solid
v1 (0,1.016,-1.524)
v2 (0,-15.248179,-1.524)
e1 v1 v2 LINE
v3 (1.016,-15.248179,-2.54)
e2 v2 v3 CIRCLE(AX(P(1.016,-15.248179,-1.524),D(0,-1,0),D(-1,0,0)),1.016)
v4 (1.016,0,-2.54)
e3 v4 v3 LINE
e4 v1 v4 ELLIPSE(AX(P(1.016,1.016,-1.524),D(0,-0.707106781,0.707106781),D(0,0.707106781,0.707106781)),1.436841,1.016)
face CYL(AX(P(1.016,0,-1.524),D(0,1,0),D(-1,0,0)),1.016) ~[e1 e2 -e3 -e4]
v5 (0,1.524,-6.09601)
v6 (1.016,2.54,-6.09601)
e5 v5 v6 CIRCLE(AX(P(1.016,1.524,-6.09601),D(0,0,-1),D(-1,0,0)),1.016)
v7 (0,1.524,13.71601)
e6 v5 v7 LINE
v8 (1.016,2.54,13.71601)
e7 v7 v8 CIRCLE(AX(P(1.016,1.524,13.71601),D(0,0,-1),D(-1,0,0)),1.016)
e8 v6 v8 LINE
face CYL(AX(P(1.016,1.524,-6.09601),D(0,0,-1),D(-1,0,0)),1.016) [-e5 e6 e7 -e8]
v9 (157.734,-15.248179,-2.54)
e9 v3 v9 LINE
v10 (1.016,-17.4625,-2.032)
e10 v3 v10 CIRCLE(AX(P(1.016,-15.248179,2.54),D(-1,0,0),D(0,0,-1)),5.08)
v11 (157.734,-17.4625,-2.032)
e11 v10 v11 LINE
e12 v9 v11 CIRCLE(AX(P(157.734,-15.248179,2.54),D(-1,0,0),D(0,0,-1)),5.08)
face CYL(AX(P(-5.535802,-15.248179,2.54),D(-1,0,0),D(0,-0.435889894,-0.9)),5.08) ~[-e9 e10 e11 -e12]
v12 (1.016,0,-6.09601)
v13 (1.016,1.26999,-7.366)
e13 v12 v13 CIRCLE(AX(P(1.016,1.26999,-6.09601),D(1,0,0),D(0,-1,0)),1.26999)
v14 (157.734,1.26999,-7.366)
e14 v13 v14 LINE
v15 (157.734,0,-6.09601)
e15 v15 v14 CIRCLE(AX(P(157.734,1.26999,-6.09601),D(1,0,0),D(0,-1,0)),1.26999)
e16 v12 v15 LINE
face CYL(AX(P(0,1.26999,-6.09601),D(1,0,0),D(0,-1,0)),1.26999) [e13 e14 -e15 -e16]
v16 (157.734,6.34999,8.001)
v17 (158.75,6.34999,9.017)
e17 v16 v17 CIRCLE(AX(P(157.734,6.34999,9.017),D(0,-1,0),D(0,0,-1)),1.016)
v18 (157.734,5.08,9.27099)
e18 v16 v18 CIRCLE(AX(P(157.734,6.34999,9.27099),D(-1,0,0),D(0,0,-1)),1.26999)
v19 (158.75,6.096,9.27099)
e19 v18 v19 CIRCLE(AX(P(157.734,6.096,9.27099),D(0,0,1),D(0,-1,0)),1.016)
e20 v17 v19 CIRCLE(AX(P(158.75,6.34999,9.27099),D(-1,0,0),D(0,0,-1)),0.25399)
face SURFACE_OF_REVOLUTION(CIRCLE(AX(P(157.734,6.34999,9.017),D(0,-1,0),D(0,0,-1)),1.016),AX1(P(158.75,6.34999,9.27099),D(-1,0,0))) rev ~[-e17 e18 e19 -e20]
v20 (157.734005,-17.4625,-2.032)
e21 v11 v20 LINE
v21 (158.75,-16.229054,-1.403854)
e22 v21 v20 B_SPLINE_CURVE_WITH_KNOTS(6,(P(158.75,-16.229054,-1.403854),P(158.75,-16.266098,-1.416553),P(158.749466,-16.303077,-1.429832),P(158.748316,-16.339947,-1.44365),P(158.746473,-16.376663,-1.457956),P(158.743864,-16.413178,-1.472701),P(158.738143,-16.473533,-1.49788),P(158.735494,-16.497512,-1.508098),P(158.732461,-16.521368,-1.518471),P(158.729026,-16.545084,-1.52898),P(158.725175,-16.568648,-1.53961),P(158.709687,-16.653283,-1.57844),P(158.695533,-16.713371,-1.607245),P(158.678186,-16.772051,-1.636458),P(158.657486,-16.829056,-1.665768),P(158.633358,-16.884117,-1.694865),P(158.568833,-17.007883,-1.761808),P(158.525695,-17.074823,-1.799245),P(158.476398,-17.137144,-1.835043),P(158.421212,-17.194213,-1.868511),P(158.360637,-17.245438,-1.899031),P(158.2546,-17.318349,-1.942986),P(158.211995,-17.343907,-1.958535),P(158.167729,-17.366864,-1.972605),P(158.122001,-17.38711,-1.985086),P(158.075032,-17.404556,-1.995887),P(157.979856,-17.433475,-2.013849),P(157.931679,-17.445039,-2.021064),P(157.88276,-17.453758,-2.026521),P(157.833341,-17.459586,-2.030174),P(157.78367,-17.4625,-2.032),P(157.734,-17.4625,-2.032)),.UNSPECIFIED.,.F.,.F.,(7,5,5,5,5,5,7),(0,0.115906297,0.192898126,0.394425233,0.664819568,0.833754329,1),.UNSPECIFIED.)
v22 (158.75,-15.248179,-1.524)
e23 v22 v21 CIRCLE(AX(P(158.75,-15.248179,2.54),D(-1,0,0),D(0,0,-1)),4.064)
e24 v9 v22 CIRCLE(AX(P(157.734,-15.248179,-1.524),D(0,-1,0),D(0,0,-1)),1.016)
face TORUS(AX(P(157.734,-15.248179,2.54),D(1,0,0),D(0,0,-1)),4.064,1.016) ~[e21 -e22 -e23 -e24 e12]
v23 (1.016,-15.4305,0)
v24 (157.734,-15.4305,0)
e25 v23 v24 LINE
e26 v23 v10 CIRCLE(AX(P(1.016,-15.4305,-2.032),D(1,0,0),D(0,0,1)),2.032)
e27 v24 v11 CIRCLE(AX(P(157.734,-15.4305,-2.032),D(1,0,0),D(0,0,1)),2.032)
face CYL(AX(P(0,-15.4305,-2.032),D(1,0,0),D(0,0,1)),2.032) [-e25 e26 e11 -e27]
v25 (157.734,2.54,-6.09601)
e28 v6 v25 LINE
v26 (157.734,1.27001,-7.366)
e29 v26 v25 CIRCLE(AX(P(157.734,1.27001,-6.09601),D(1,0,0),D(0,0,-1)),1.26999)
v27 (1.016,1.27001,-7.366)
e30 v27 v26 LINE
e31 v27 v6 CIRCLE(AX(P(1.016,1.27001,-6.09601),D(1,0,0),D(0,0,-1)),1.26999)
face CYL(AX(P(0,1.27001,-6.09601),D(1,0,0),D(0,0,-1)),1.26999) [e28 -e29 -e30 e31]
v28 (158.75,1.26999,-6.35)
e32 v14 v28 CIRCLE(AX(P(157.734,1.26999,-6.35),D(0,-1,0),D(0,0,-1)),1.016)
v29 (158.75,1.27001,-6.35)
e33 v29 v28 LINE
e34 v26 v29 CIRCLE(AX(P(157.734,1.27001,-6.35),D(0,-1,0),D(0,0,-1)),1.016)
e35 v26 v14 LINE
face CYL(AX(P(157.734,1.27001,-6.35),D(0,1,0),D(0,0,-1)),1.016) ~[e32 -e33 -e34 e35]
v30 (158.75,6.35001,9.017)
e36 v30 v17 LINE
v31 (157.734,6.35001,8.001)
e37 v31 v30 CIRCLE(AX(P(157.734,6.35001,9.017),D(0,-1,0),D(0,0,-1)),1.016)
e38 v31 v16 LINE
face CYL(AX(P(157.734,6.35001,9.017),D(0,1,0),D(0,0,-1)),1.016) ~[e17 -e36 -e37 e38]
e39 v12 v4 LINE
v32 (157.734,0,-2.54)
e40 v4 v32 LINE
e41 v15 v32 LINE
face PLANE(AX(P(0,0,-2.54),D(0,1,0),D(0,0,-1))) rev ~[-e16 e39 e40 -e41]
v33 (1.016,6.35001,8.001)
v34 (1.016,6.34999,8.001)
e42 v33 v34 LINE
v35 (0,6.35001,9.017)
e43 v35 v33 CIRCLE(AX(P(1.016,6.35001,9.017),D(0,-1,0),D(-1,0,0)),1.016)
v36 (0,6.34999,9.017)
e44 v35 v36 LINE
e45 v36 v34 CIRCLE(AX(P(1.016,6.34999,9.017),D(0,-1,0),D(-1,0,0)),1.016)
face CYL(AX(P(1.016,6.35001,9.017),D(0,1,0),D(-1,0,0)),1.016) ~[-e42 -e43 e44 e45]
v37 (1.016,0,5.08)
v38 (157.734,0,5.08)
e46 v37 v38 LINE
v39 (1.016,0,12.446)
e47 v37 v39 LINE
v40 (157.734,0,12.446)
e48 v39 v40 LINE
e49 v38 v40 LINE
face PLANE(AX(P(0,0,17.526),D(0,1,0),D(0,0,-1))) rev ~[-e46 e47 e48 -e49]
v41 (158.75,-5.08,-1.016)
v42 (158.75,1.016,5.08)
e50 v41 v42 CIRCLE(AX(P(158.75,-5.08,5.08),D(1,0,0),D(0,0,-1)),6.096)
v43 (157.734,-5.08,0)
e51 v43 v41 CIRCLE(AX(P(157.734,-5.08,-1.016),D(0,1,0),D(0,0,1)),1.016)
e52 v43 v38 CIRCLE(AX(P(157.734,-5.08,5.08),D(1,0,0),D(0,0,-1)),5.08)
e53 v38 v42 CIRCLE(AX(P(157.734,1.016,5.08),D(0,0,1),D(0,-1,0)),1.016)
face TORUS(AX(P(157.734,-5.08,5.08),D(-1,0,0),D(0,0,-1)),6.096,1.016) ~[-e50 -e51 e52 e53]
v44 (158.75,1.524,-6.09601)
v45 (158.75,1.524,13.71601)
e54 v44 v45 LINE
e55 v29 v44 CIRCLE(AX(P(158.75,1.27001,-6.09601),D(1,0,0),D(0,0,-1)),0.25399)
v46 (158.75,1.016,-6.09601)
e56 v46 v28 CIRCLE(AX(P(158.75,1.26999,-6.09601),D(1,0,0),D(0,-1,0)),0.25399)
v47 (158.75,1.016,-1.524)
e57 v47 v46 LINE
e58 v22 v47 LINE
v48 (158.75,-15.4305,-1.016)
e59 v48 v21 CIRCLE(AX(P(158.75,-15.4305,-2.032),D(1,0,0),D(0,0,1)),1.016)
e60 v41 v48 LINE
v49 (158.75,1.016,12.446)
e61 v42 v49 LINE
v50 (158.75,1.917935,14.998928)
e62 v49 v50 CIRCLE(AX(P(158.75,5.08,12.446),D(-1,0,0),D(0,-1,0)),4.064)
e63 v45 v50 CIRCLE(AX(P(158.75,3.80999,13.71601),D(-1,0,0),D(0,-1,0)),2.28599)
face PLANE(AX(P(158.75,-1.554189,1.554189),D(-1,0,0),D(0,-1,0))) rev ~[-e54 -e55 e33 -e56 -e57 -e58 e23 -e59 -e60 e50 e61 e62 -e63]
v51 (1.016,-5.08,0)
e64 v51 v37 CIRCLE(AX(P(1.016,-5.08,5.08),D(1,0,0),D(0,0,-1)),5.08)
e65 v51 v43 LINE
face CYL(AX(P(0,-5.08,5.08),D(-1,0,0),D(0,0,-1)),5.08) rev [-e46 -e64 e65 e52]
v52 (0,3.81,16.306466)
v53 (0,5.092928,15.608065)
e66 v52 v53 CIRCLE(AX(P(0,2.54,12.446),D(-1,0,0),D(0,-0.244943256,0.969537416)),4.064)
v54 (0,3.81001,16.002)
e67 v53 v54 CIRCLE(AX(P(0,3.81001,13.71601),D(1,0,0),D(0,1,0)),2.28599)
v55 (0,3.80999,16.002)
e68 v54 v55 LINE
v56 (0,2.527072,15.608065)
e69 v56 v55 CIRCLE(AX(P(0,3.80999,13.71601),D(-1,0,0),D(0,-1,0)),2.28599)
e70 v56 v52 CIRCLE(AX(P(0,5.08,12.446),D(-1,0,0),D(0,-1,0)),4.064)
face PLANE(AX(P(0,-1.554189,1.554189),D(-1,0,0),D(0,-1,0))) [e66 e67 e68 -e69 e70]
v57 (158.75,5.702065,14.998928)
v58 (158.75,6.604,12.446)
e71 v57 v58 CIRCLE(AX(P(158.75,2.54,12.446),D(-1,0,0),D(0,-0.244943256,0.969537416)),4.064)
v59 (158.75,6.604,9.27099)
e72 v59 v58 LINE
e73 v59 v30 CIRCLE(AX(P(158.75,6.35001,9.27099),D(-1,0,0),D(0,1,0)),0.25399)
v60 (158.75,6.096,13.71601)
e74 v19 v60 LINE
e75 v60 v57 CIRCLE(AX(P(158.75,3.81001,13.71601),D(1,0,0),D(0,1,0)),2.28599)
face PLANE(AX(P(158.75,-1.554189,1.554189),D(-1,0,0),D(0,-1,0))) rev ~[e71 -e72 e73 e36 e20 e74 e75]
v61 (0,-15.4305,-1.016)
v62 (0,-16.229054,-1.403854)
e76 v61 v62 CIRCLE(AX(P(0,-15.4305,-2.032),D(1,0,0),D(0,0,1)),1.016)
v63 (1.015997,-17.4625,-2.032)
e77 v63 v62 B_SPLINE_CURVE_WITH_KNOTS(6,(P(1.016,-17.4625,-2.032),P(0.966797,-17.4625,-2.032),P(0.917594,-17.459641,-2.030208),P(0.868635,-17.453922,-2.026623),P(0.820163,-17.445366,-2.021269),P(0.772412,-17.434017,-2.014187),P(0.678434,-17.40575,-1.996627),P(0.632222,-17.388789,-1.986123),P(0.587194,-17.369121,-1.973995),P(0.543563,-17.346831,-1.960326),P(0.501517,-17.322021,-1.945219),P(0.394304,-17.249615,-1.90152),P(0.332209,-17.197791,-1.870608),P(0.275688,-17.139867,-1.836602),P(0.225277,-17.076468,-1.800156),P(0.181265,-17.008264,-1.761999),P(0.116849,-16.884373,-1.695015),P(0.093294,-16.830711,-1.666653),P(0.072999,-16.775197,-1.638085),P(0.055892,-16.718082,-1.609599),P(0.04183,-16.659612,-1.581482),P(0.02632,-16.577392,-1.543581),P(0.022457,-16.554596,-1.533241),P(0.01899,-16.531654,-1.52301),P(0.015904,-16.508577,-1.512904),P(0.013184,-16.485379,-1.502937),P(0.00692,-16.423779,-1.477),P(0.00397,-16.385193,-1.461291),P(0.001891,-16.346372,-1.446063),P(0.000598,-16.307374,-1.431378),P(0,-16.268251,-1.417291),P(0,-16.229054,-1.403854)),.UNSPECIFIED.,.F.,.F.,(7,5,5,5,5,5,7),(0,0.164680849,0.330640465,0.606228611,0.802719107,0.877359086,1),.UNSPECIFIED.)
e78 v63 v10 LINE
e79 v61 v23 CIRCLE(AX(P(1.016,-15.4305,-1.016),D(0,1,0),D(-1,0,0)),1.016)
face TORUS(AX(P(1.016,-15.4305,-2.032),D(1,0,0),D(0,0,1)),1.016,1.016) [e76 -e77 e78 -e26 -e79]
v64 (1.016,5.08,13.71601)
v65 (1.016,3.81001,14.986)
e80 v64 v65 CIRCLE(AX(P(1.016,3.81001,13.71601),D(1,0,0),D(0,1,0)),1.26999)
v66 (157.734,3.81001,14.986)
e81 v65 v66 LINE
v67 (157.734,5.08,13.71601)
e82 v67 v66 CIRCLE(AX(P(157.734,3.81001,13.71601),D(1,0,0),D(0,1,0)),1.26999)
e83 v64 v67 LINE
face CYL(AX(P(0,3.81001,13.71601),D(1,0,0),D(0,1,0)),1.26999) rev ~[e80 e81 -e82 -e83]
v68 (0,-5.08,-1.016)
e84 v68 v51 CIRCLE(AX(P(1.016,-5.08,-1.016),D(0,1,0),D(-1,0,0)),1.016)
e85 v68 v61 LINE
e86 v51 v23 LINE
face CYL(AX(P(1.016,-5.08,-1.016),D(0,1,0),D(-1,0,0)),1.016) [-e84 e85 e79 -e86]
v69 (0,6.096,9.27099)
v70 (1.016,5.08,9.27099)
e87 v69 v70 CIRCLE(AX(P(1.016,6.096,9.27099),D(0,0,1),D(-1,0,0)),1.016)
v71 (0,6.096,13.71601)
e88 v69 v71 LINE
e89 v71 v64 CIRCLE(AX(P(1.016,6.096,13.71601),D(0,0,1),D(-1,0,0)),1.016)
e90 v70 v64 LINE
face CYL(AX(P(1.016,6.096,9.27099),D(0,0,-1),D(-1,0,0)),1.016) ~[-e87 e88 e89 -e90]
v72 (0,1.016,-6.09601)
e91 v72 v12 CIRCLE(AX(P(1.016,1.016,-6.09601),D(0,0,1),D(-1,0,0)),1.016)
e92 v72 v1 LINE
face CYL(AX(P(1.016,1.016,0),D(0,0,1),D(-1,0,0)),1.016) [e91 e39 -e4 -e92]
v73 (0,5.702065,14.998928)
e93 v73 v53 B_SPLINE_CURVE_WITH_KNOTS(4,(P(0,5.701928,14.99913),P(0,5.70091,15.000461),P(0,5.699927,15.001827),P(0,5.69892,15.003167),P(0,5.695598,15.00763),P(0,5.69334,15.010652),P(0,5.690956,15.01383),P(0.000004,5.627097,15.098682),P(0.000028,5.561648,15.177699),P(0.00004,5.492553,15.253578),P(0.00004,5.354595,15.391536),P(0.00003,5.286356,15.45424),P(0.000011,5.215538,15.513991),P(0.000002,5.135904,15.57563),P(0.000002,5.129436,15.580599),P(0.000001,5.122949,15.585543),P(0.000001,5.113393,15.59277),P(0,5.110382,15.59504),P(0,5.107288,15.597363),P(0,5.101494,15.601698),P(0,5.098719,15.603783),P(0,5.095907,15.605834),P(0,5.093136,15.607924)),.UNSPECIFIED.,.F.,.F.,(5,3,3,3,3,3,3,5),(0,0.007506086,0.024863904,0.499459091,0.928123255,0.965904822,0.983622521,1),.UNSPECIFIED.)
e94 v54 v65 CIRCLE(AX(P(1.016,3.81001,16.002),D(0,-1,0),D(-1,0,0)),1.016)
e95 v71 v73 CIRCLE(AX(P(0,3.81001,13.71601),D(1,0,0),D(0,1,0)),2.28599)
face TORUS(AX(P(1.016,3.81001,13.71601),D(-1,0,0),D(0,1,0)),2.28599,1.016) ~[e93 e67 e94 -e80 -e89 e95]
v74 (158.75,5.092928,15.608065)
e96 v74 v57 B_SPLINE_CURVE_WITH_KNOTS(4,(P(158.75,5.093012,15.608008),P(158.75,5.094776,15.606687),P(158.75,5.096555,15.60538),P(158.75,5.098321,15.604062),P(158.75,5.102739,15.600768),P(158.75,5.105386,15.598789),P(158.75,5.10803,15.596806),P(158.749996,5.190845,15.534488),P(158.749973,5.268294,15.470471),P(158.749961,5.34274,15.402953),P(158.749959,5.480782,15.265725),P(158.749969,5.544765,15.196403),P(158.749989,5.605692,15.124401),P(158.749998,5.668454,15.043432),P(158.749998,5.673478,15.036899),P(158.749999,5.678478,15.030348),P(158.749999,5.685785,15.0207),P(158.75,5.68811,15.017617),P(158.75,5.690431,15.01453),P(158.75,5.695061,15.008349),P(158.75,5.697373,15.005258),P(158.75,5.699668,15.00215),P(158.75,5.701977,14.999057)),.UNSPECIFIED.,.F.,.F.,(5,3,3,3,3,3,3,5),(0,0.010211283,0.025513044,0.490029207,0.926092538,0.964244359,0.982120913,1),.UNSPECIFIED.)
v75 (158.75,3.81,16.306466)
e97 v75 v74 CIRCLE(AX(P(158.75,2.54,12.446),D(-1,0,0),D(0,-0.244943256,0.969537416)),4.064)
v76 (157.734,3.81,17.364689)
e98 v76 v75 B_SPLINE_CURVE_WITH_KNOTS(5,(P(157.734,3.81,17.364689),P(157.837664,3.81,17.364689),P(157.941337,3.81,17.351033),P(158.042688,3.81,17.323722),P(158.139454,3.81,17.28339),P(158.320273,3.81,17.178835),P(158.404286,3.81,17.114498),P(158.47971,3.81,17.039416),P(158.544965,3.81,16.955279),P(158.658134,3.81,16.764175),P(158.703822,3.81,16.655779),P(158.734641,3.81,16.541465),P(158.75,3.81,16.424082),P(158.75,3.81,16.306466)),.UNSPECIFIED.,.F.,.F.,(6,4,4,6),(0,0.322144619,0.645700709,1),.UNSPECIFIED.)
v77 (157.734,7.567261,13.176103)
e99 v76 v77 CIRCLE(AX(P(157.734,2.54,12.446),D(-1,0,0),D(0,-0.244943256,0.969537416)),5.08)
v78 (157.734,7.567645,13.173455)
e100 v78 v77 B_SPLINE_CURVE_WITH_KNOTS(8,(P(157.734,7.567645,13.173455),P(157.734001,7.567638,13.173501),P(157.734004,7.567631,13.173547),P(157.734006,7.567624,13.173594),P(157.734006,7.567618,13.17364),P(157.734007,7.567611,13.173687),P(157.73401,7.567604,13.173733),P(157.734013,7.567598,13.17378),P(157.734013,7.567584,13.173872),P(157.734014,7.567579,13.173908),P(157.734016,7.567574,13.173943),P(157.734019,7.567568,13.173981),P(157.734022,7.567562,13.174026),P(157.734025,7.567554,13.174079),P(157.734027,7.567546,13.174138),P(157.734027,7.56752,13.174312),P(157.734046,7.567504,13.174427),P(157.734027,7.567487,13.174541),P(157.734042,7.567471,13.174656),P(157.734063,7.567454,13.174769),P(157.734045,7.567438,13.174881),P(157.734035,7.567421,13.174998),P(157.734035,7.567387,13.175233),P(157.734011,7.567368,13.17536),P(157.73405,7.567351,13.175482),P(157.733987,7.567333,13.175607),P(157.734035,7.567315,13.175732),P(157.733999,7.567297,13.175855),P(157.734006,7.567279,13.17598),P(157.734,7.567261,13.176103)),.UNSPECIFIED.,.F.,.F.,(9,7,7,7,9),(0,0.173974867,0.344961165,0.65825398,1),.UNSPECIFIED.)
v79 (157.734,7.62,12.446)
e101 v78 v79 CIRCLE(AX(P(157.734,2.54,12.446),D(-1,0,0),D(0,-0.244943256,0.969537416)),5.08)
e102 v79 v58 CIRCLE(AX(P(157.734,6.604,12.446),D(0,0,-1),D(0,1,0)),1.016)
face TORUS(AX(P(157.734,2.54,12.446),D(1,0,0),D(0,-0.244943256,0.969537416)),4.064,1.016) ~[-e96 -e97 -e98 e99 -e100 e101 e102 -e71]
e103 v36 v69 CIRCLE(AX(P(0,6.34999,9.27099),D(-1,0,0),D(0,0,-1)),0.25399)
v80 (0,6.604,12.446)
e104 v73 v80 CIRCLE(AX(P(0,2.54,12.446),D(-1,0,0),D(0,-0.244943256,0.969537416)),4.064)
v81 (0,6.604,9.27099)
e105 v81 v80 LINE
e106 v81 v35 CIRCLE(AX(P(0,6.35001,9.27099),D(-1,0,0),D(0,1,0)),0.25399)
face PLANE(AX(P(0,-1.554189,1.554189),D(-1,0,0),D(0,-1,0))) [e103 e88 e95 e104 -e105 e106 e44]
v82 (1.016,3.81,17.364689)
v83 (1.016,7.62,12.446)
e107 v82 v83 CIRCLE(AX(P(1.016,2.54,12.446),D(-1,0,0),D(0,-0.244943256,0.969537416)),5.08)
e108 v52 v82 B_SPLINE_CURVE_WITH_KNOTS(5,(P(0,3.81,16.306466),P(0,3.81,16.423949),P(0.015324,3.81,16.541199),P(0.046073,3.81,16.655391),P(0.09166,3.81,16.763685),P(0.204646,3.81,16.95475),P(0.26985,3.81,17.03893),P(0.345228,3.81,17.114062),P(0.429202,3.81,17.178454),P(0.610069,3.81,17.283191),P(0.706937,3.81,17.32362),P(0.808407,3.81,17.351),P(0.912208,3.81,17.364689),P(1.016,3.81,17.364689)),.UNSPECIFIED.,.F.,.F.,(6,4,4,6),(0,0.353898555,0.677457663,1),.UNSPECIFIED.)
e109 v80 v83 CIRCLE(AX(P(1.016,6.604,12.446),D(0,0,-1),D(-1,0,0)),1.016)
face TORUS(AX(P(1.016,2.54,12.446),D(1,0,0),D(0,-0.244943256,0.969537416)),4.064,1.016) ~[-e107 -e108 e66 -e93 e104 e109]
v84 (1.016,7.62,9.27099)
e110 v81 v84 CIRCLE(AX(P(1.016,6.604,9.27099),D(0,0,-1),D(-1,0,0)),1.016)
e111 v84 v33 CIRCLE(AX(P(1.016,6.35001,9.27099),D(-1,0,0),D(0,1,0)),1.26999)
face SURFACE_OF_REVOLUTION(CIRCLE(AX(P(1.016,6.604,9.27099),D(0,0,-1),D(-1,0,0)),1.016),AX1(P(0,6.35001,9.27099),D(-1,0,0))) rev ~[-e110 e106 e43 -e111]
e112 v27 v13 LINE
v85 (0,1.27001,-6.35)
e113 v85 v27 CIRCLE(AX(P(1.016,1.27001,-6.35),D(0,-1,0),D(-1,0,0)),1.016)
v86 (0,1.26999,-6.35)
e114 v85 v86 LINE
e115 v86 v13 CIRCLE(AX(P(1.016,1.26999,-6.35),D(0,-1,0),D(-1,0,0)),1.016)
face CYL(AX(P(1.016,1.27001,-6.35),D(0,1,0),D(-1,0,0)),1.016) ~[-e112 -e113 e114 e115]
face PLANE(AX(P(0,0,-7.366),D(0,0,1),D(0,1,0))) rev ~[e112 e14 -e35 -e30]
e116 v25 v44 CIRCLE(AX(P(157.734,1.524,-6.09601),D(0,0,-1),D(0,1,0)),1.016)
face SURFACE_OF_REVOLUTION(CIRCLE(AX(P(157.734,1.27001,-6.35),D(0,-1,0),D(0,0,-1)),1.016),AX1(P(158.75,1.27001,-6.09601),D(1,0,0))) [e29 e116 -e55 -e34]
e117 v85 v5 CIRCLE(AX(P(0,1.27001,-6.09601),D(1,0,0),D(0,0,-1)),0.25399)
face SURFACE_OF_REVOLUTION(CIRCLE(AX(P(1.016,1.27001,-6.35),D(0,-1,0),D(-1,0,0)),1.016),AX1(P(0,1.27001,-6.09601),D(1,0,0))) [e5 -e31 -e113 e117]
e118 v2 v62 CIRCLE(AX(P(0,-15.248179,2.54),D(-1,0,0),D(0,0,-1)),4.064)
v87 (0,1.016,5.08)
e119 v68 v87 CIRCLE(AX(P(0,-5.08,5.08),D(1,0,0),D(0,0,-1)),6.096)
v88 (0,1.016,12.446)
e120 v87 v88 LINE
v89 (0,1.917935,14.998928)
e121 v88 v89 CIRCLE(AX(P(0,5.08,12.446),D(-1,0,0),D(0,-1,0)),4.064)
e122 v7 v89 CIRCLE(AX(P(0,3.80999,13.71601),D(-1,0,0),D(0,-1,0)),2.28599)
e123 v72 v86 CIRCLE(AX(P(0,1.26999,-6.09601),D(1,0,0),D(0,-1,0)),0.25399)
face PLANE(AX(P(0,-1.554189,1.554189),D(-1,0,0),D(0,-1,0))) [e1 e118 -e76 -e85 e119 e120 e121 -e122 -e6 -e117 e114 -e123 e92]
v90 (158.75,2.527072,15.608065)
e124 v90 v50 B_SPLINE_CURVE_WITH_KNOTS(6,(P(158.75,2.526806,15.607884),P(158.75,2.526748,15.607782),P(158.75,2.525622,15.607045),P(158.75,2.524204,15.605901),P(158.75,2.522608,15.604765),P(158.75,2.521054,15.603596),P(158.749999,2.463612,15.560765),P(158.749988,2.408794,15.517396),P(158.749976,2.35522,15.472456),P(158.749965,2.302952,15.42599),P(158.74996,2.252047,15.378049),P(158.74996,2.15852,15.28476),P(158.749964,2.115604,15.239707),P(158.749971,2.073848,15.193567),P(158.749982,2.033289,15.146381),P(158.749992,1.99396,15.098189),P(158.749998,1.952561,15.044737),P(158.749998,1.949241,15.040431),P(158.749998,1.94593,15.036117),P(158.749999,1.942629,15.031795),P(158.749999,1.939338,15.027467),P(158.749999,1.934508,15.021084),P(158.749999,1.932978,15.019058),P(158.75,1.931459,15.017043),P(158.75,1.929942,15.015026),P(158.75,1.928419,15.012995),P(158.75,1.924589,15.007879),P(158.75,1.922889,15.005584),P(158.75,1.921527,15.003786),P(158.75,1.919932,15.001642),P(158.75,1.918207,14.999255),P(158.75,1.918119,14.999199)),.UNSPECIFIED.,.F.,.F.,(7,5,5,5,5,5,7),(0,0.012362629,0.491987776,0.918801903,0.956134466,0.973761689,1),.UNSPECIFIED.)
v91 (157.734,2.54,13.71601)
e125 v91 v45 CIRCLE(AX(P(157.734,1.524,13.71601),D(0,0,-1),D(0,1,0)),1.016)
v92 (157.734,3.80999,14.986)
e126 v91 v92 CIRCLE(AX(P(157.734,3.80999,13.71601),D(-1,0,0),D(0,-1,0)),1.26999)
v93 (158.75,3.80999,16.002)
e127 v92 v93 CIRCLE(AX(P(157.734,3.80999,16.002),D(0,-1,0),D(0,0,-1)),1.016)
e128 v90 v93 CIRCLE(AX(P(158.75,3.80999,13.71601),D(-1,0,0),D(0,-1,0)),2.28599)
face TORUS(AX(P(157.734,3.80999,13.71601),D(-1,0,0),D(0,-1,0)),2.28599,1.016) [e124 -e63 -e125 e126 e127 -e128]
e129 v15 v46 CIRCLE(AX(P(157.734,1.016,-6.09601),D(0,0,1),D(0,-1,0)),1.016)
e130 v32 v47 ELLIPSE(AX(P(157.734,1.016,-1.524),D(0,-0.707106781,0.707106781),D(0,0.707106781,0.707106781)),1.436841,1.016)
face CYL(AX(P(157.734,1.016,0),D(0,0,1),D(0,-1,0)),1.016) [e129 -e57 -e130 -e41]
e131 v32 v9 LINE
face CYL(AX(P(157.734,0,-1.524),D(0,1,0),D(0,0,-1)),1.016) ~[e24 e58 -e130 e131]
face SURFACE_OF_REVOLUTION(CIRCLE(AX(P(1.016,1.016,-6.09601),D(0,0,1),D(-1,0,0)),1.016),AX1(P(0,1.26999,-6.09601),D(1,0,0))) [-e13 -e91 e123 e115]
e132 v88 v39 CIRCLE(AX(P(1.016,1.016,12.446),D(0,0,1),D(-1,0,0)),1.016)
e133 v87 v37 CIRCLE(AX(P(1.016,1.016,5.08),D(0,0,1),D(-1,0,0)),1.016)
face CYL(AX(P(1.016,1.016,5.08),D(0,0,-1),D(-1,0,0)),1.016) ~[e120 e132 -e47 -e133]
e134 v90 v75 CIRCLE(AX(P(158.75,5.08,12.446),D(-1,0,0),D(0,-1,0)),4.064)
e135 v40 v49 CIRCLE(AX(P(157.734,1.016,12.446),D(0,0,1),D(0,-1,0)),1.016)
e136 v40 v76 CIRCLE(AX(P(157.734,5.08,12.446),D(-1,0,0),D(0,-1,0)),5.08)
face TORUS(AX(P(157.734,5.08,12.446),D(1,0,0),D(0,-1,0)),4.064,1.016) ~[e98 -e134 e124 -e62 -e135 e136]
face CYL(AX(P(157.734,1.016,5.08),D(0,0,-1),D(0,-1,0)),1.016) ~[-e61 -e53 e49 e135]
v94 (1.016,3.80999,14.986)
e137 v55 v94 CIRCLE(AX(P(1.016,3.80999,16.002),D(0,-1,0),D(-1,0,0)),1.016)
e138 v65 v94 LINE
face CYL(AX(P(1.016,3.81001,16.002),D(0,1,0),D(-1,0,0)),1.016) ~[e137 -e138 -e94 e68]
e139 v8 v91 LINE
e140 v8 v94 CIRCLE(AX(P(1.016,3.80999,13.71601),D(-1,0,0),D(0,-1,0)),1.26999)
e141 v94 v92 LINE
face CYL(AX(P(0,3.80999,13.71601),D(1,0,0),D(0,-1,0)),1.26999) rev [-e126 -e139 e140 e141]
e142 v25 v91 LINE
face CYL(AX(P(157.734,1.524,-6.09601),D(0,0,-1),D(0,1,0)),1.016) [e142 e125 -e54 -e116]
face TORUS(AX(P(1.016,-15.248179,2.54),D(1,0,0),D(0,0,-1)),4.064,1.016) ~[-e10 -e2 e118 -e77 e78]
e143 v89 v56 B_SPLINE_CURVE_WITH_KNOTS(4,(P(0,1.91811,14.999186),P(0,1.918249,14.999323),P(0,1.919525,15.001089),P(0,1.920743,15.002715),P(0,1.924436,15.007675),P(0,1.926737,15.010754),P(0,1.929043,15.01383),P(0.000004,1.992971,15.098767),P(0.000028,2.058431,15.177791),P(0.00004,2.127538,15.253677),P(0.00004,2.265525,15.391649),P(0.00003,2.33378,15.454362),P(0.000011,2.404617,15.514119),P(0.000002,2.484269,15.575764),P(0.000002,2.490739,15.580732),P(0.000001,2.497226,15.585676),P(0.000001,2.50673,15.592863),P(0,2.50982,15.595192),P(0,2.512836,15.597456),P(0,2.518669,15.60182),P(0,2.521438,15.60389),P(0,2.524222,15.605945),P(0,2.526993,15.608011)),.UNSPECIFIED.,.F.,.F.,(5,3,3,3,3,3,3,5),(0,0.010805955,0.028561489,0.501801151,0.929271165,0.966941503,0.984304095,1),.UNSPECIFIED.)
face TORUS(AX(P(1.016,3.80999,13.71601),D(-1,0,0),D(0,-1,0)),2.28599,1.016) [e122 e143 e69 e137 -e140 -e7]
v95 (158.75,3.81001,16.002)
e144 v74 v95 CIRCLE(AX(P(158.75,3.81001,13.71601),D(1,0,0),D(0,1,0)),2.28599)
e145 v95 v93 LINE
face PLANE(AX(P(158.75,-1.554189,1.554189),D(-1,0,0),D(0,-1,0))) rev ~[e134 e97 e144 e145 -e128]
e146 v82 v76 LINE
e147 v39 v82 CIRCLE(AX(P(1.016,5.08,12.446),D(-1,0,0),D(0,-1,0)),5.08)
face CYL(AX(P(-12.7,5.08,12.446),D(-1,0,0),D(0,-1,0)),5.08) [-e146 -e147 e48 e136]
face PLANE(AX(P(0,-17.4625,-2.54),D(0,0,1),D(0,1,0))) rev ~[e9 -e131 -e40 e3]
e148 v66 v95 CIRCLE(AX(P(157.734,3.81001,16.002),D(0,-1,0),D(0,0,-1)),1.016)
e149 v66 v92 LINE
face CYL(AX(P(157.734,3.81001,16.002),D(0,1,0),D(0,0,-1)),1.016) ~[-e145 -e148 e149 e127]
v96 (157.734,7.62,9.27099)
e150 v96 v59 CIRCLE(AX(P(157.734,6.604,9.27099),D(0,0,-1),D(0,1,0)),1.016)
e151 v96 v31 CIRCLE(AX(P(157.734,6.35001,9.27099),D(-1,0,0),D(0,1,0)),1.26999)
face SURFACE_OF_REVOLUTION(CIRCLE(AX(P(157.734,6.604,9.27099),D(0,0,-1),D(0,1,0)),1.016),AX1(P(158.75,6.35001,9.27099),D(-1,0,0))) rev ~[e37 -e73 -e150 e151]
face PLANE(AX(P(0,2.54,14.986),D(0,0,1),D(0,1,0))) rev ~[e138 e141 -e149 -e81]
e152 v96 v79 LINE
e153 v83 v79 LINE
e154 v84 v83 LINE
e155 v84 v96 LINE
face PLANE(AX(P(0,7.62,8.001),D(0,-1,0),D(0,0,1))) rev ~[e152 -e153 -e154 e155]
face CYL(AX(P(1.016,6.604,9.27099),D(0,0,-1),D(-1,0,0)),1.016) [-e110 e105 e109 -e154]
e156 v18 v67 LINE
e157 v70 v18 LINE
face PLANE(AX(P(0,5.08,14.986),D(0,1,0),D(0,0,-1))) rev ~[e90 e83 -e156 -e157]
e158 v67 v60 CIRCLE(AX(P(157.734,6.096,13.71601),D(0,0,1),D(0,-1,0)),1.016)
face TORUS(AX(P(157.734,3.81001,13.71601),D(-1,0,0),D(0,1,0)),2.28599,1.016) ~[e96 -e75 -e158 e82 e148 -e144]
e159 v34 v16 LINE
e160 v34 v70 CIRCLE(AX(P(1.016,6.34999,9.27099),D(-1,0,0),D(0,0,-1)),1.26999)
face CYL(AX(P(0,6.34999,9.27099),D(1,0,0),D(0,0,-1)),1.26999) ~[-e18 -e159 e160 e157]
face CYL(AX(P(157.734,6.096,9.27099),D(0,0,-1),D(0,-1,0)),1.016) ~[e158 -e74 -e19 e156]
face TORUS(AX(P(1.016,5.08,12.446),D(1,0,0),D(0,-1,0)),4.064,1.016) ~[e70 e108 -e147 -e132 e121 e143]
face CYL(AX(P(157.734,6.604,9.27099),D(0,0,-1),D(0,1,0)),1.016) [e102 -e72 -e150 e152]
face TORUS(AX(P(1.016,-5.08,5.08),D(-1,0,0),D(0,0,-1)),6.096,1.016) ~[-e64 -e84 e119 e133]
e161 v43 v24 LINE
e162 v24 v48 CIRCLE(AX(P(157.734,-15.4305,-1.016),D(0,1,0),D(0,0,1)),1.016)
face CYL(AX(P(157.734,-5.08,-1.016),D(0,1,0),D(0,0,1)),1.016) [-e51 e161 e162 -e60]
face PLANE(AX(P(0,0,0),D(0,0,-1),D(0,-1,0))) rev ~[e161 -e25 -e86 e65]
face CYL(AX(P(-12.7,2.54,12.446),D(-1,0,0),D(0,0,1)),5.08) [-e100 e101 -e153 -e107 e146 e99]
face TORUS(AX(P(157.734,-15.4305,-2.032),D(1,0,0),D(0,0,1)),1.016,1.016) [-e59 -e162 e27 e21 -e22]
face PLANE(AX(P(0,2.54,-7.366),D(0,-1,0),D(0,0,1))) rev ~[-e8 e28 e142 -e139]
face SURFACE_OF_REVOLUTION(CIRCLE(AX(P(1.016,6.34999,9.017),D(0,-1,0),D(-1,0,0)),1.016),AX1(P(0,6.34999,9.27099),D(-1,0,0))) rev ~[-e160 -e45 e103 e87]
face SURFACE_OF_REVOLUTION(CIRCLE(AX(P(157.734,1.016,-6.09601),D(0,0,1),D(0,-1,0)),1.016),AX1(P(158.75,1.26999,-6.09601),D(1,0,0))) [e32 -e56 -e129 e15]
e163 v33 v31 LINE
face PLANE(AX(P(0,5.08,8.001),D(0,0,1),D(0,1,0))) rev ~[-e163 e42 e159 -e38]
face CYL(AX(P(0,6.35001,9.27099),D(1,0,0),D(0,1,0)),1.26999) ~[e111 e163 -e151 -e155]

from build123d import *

# Parameters (mm, degrees)
F1_DEPTH     = 158.75
F2_R         = 2.032
F3_R         = 1.26999
F4_T1_DEPTH  = 169.8216033166
F5_T1_DEPTH  = 158.75
F5_T3_DEPTH  = 184.15
F6_T1_DEPTH  = 2e-05
F6_T3_DEPTH  = 4.44502
F6_T5_DEPTH  = 2e-05
F6_T7_DEPTH  = 19.81202
F6_T9_DEPTH  = 2e-05
F6_T11_DEPTH = 3.55601
F6_T13_DEPTH = 15.2481793367
F6_T15_DEPTH = 10.3505
F6_T17_DEPTH = 7.366
F6_T19_DEPTH = 3.17501
F6_T22_ANGLE = 90
F6_T24_ANGLE = 90
F6_T26_ANGLE = 90
F6_T28_ANGLE = 90
F6_T30_ANGLE = 90
F6_T32_ANGLE = 90
F6_T34_ANGLE = 54.4907710803
F6_T36_ANGLE = 161.6484946187
F6_T38_ANGLE = 89.9999999979
F6_T40_ANGLE = 104.1784803607
F6_T42_ANGLE = 104.1784803607
F6_T44_ANGLE = 90
F6_T46_ANGLE = 90
F6_T48_ANGLE = 90
F6_T50_ANGLE = 90
F6_T52_ANGLE = 90
F6_T54_ANGLE = 90
F6_T56_ANGLE = 54.4907710803
F6_T58_ANGLE = 161.6484946187
F6_T60_ANGLE = 89.9999999979
F6_T62_ANGLE = 104.1784803607
F6_T64_ANGLE = 104.1784803607
F6_T69_DEPTH = 6.09601
F6_T73_DEPTH = 17.7881793367
F6_T80_DEPTH = 6.09601
F6_T84_DEPTH = 17.7881793367


# Not quite as in the source:
# - a fillet or chamfer that OpenCascade refuses, or shapes differently, is made with other operations: its cross-section is extruded or revolved along the edge and cut away or added
# - a fillet or chamfer is up to 0.001 mm smaller than in the source, because OpenCascade refuses the exact size


with BuildPart() as f1:
    # F0 (on Right) → F1 (new body)
    with BuildSketch(Plane.YZ):
        Polygon((0, 17.526), (0, 0), (-17.4625, 0), (-17.4625, -2.54), (0, -2.54), (0, -7.366), (2.54, -7.366), (2.54, 14.986), (5.08, 14.986), (5.08, 8.001), (7.62, 8.001), (7.62, 17.526), align=None)
    extrude(amount=F1_DEPTH)

    # F2
    f2_edges = [f1.edges().sort_by_distance(p)[0] for p in [
        (79.375, -17.4625, 0),
    ]]
    fillet(f2_edges, radius=F2_R)

    # F3 (radius 1.27 in the source; OpenCascade refuses exactly that, so slightly less here)
    f3_edges = [f1.edges().sort_by_distance(p)[0] for p in [
        (79.375, 2.54, 14.986),
        (79.375, 5.08, 14.986),
        (79.375, 5.08, 8.001),
        (79.375, 7.62, 8.001),
        (79.375, 2.54, -7.366),
        (79.375, 0, -7.366),
    ]]
    fillet(f3_edges, radius=F3_R)

    # F4: fillet of radius 5.08 on 1 edges, made by hand

    # F4_s2 → F4_t1 (cut)
    with BuildSketch(Plane.YZ.offset(-5.5358016583)):
        with BuildLine():
            ThreePointArc((-17.4625, -2.032), (-16.3841018693, -2.4113715272), (-15.2481793367, -2.54))
            Line((-15.2481793367, -2.54), (-17.4625, -2.54))
            Line((-17.4625, -2.54), (-17.4625, -2.032))
        make_face()
    extrude(amount=F4_T1_DEPTH, mode=Mode.SUBTRACT)

    # F5: fillet of radius 5.08 on 3 edges, made by hand

    # F5_s2 → F5_t1 (join)
    with BuildSketch(Plane.YZ):
        with BuildLine():
            ThreePointArc((-5.08, 0), (-1.4878975516, 1.4878975516), (0, 5.08))
            Line((0, 5.08), (0, 0))
            Line((0, 0), (-5.08, 0))
        make_face()
    extrude(amount=F5_T1_DEPTH)

    # F5_s4 → F5_t3 (cut)
    with BuildSketch(Plane.YZ.offset(-12.7)):
        with BuildLine():
            ThreePointArc((0, 12.446), (1.4878975516, 16.0381024484), (5.08, 17.526))
            Line((5.08, 17.526), (0, 17.526))
            Line((0, 17.526), (0, 12.446))
        make_face()
        with BuildLine():
            ThreePointArc((2.54, 17.526), (6.1321024484, 16.0381024484), (7.62, 12.446))
            Line((7.62, 12.446), (7.62, 17.526))
            Line((7.62, 17.526), (2.54, 17.526))
        make_face()
    extrude(amount=F5_T3_DEPTH, mode=Mode.SUBTRACT)

    # F6: fillet of radius 1.016 on 42 edges, made by hand

    # F6_s2 → F6_t1 (cut)
    with BuildSketch(Plane.XZ.offset(-6.35001)):
        with BuildLine():
            ThreePointArc((157.734, 8.001), (158.4524204897, 8.2985795103), (158.75, 9.017))
            Line((158.75, 9.017), (158.75, 8.001))
            Line((158.75, 8.001), (157.734, 8.001))
        make_face()
        with BuildLine():
            ThreePointArc((0, 9.017), (0.2975795103, 8.2985795103), (1.016, 8.001))
            Line((1.016, 8.001), (0, 8.001))
            Line((0, 8.001), (0, 9.017))
        make_face()
    extrude(amount=F6_T1_DEPTH, mode=Mode.SUBTRACT)

    # F6_s4 → F6_t3 (cut)
    with BuildSketch(Plane.XY.offset(9.27099)):
        with BuildLine():
            ThreePointArc((157.734, 5.08), (158.4524204897, 5.3775795103), (158.75, 6.096))
            Line((158.75, 6.096), (158.75, 5.08))
            Line((158.75, 5.08), (157.734, 5.08))
        make_face()
        with BuildLine():
            ThreePointArc((0, 6.096), (0.2975795103, 5.3775795103), (1.016, 5.08))
            Line((1.016, 5.08), (0, 5.08))
            Line((0, 5.08), (0, 6.096))
        make_face()
    extrude(amount=F6_T3_DEPTH, mode=Mode.SUBTRACT)

    # F6_s6 → F6_t5 (cut)
    with BuildSketch(Plane.XZ.offset(-3.81001)):
        with BuildLine():
            ThreePointArc((157.734, 14.986), (158.4524204897, 15.2835795103), (158.75, 16.002))
            Line((158.75, 16.002), (158.75, 14.986))
            Line((158.75, 14.986), (157.734, 14.986))
        make_face()
        with BuildLine():
            ThreePointArc((0, 16.002), (0.2975795103, 15.2835795103), (1.016, 14.986))
            Line((1.016, 14.986), (0, 14.986))
            Line((0, 14.986), (0, 16.002))
        make_face()
    extrude(amount=F6_T5_DEPTH, mode=Mode.SUBTRACT)

    # F6_s8 → F6_t7 (cut)
    with BuildSketch(Plane.XY.offset(-6.09601)):
        with BuildLine():
            ThreePointArc((157.734, 2.54), (158.4524204897, 2.2424204897), (158.75, 1.524))
            Line((158.75, 1.524), (158.75, 2.54))
            Line((158.75, 2.54), (157.734, 2.54))
        make_face()
        with BuildLine():
            ThreePointArc((0, 1.524), (0.2975795103, 2.2424204897), (1.016, 2.54))
            Line((1.016, 2.54), (0, 2.54))
            Line((0, 2.54), (0, 1.524))
        make_face()
    extrude(amount=F6_T7_DEPTH, mode=Mode.SUBTRACT)

    # F6_s10 → F6_t9 (cut)
    with BuildSketch(Plane.XZ.offset(-1.27001)):
        with BuildLine():
            ThreePointArc((157.734, -7.366), (158.4524204897, -7.0684204897), (158.75, -6.35))
            Line((158.75, -6.35), (158.75, -7.366))
            Line((158.75, -7.366), (157.734, -7.366))
        make_face()
        with BuildLine():
            ThreePointArc((0, -6.35), (0.2975795103, -7.0684204897), (1.016, -7.366))
            Line((1.016, -7.366), (0, -7.366))
            Line((0, -7.366), (0, -6.35))
        make_face()
    extrude(amount=F6_T9_DEPTH, mode=Mode.SUBTRACT)

    # F6_s12 → F6_t11 (cut)
    with BuildSketch(Plane.XY.offset(-6.09601)):
        with BuildLine():
            ThreePointArc((157.734, 0), (158.4524204897, 0.2975795103), (158.75, 1.016))
            Line((158.75, 1.016), (158.75, 0))
            Line((158.75, 0), (157.734, 0))
        make_face()
        with BuildLine():
            ThreePointArc((0, 1.016), (0.2975795103, 0.2975795103), (1.016, 0))
            Line((1.016, 0), (0, 0))
            Line((0, 0), (0, 1.016))
        make_face()
    extrude(amount=F6_T11_DEPTH, mode=Mode.SUBTRACT)

    # F6_s14 → F6_t13 (cut)
    with BuildSketch(Plane.XZ):
        with BuildLine():
            ThreePointArc((157.734, -2.54), (158.4524204897, -2.2424204897), (158.75, -1.524))
            Line((158.75, -1.524), (158.75, -2.54))
            Line((158.75, -2.54), (157.734, -2.54))
        make_face()
        with BuildLine():
            ThreePointArc((0, -1.524), (0.2975795103, -2.2424204897), (1.016, -2.54))
            Line((1.016, -2.54), (0, -2.54))
            Line((0, -2.54), (0, -1.524))
        make_face()
    extrude(amount=F6_T13_DEPTH, mode=Mode.SUBTRACT)

    # F6_s16 → F6_t15 (cut)
    with BuildSketch(Plane.XZ.offset(5.08)):
        with BuildLine():
            ThreePointArc((157.734, 0), (158.4524204897, -0.2975795103), (158.75, -1.016))
            Line((158.75, -1.016), (158.75, 0))
            Line((158.75, 0), (157.734, 0))
        make_face()
        with BuildLine():
            ThreePointArc((0, -1.016), (0.2975795103, -0.2975795103), (1.016, 0))
            Line((1.016, 0), (0, 0))
            Line((0, 0), (0, -1.016))
        make_face()
    extrude(amount=F6_T15_DEPTH, mode=Mode.SUBTRACT)

    # F6_s18 → F6_t17 (cut)
    with BuildSketch(Plane.XY.offset(5.08)):
        with BuildLine():
            ThreePointArc((157.734, 0), (158.4524204897, 0.2975795103), (158.75, 1.016))
            Line((158.75, 1.016), (158.75, 0))
            Line((158.75, 0), (157.734, 0))
        make_face()
        with BuildLine():
            ThreePointArc((0, 1.016), (0.2975795103, 0.2975795103), (1.016, 0))
            Line((1.016, 0), (0, 0))
            Line((0, 0), (0, 1.016))
        make_face()
    extrude(amount=F6_T17_DEPTH, mode=Mode.SUBTRACT)

    # F6_s20 → F6_t19 (cut)
    with BuildSketch(Plane.XY.offset(9.27099)):
        with BuildLine():
            ThreePointArc((157.734, 7.62), (158.4524204897, 7.3224204897), (158.75, 6.604))
            Line((158.75, 6.604), (158.75, 7.62))
            Line((158.75, 7.62), (157.734, 7.62))
        make_face()
        with BuildLine():
            ThreePointArc((0, 6.604), (0.2975795103, 7.3224204897), (1.016, 7.62))
            Line((1.016, 7.62), (0, 7.62))
            Line((0, 7.62), (0, 6.604))
        make_face()
    extrude(amount=F6_T19_DEPTH, mode=Mode.SUBTRACT)

    # F6_s21 → F6_t22 (revolve, cut)
    with BuildSketch(Plane.XY.offset(9.27099)):
        with BuildLine():
            ThreePointArc((157.734, 7.62), (158.4524204897, 7.3224204897), (158.75, 6.604))
            Line((158.75, 6.604), (158.75, 7.62))
            Line((158.75, 7.62), (157.734, 7.62))
        make_face()
    revolve(axis=Axis((158.75, 6.35001, 9.27099), (-1, 0, 0)), revolution_arc=F6_T22_ANGLE, mode=Mode.SUBTRACT)

    # F6_s23 → F6_t24 (revolve, cut)
    with BuildSketch(Plane.XZ.offset(-6.34999)):
        with BuildLine():
            ThreePointArc((157.734, 8.001), (158.4524204897, 8.2985795103), (158.75, 9.017))
            Line((158.75, 9.017), (158.75, 8.001))
            Line((158.75, 8.001), (157.734, 8.001))
        make_face()
    revolve(axis=Axis((158.75, 6.34999, 9.27099), (-1, 0, 0)), revolution_arc=F6_T24_ANGLE, mode=Mode.SUBTRACT)

    # F6_s25 → F6_t26 (revolve, cut)
    with BuildSketch(Plane.XY.offset(13.71601)):
        with BuildLine():
            ThreePointArc((157.734, 5.08), (158.4524204897, 5.3775795103), (158.75, 6.096))
            Line((158.75, 6.096), (158.75, 5.08))
            Line((158.75, 5.08), (157.734, 5.08))
        make_face()
    revolve(axis=Axis((158.75, 3.81001, 13.71601), (1, 0, 0)), revolution_arc=F6_T26_ANGLE, mode=Mode.SUBTRACT)

    # F6_s27 → F6_t28 (revolve, cut)
    with BuildSketch(Plane.XY.offset(13.71601)):
        with BuildLine():
            ThreePointArc((157.734, 2.54), (158.4524204897, 2.2424204897), (158.75, 1.524))
            Line((158.75, 1.524), (158.75, 2.54))
            Line((158.75, 2.54), (157.734, 2.54))
        make_face()
    revolve(axis=Axis((158.75, 3.80999, 13.71601), (-1, 0, 0)), revolution_arc=F6_T28_ANGLE, mode=Mode.SUBTRACT)

    # F6_s29 → F6_t30 (revolve, cut)
    with BuildSketch(Plane.XZ.offset(-1.27001)):
        with BuildLine():
            ThreePointArc((157.734, -7.366), (158.4524204897, -7.0684204897), (158.75, -6.35))
            Line((158.75, -6.35), (158.75, -7.366))
            Line((158.75, -7.366), (157.734, -7.366))
        make_face()
    revolve(axis=Axis((158.75, 1.27001, -6.09601), (1, 0, 0)), revolution_arc=F6_T30_ANGLE, mode=Mode.SUBTRACT)

    # F6_s31 → F6_t32 (revolve, cut)
    with BuildSketch(Plane.XY.offset(-6.09601)):
        with BuildLine():
            ThreePointArc((157.734, 0), (158.4524204897, 0.2975795103), (158.75, 1.016))
            Line((158.75, 1.016), (158.75, 0))
            Line((158.75, 0), (157.734, 0))
        make_face()
    revolve(axis=Axis((158.75, 1.26999, -6.09601), (1, 0, 0)), revolution_arc=F6_T32_ANGLE, mode=Mode.SUBTRACT)

    # F6_s33 → F6_t34 (revolve, cut)
    with BuildSketch(Plane.XZ.offset(15.2481793371)):
        with BuildLine():
            ThreePointArc((157.734, -2.54), (158.4524204897, -2.2424204897), (158.75, -1.524))
            Line((158.75, -1.524), (158.75, -2.54))
            Line((158.75, -2.54), (157.734, -2.54))
        make_face()
    revolve(axis=Axis((158.75, -15.2481793371, 2.5399999982), (-1, 0, 0)), revolution_arc=F6_T34_ANGLE, mode=Mode.SUBTRACT)

    # F6_s35 → F6_t36 (revolve, cut)
    with BuildSketch(Plane.XZ.offset(15.4305)):
        with BuildLine():
            ThreePointArc((157.734, 0), (158.4524204897, -0.2975795103), (158.75, -1.016))
            Line((158.75, -1.016), (158.75, 0))
            Line((158.75, 0), (157.734, 0))
        make_face()
    revolve(axis=Axis((158.75, -15.4305, -2.032), (1, 0, 0)), revolution_arc=F6_T36_ANGLE, mode=Mode.SUBTRACT)

    # F6_s37 → F6_t38 (revolve, cut)
    with BuildSketch(Plane.XZ.offset(5.0800000001)):
        with BuildLine():
            ThreePointArc((157.734, 0), (158.4524204897, -0.2975795103), (158.75, -1.016))
            Line((158.75, -1.016), (158.75, 0))
            Line((158.75, 0), (157.734, 0))
        make_face()
    revolve(axis=Axis((158.75, -5.0800000001, 5.0800000001), (1, 0, 0)), revolution_arc=F6_T38_ANGLE, mode=Mode.SUBTRACT)

    # F6_s39 → F6_t40 (revolve, cut)
    with BuildSketch(Plane.XY.offset(12.4459999999)):
        with BuildLine():
            ThreePointArc((157.734, 0), (158.4524204897, 0.2975795103), (158.75, 1.016))
            Line((158.75, 1.016), (158.75, 0))
            Line((158.75, 0), (157.734, 0))
        make_face()
    revolve(axis=Axis((158.75, 5.0800000001, 12.4459999999), (-1, 0, 0)), revolution_arc=F6_T40_ANGLE, mode=Mode.SUBTRACT)

    # F6_s41 → F6_t42 (revolve, cut)
    with BuildSketch(Plane(origin=(0, 5.3433037504, 1.3499285295), x_dir=(1, 0, 0), z_dir=(0, -0.9695374162, -0.244943256))):
        with BuildLine():
            ThreePointArc((157.734, 16.5247068112), (158.4524204897, 16.2271273009), (158.75, 15.5087068112))
            Line((158.75, 15.5087068112), (158.75, 16.5247068112))
            Line((158.75, 16.5247068112), (157.734, 16.5247068112))
        make_face()
    revolve(axis=Axis((158.75, 2.5399999999, 12.4459999999), (-1, 0, 0)), revolution_arc=F6_T42_ANGLE, mode=Mode.SUBTRACT)

    # F6_s43 → F6_t44 (revolve, cut)
    with BuildSketch(Plane.XY.offset(9.27099)):
        with BuildLine():
            ThreePointArc((0, 6.604), (0.2975795103, 7.3224204897), (1.016, 7.62))
            Line((1.016, 7.62), (0, 7.62))
            Line((0, 7.62), (0, 6.604))
        make_face()
    revolve(axis=Axis((0, 6.35001, 9.27099), (-1, 0, 0)), revolution_arc=F6_T44_ANGLE, mode=Mode.SUBTRACT)

    # F6_s45 → F6_t46 (revolve, cut)
    with BuildSketch(Plane.XZ.offset(-6.34999)):
        with BuildLine():
            ThreePointArc((0, 9.017), (0.2975795103, 8.2985795103), (1.016, 8.001))
            Line((1.016, 8.001), (0, 8.001))
            Line((0, 8.001), (0, 9.017))
        make_face()
    revolve(axis=Axis((0, 6.34999, 9.27099), (-1, 0, 0)), revolution_arc=F6_T46_ANGLE, mode=Mode.SUBTRACT)

    # F6_s47 → F6_t48 (revolve, cut)
    with BuildSketch(Plane.XY.offset(13.71601)):
        with BuildLine():
            ThreePointArc((0, 6.096), (0.2975795103, 5.3775795103), (1.016, 5.08))
            Line((1.016, 5.08), (0, 5.08))
            Line((0, 5.08), (0, 6.096))
        make_face()
    revolve(axis=Axis((0, 3.81001, 13.71601), (1, 0, 0)), revolution_arc=F6_T48_ANGLE, mode=Mode.SUBTRACT)

    # F6_s49 → F6_t50 (revolve, cut)
    with BuildSketch(Plane.XY.offset(13.71601)):
        with BuildLine():
            ThreePointArc((0, 1.524), (0.2975795103, 2.2424204897), (1.016, 2.54))
            Line((1.016, 2.54), (0, 2.54))
            Line((0, 2.54), (0, 1.524))
        make_face()
    revolve(axis=Axis((0, 3.80999, 13.71601), (-1, 0, 0)), revolution_arc=F6_T50_ANGLE, mode=Mode.SUBTRACT)

    # F6_s51 → F6_t52 (revolve, cut)
    with BuildSketch(Plane.XZ.offset(-1.27001)):
        with BuildLine():
            ThreePointArc((0, -6.35), (0.2975795103, -7.0684204897), (1.016, -7.366))
            Line((1.016, -7.366), (0, -7.366))
            Line((0, -7.366), (0, -6.35))
        make_face()
    revolve(axis=Axis((0, 1.27001, -6.09601), (1, 0, 0)), revolution_arc=F6_T52_ANGLE, mode=Mode.SUBTRACT)

    # F6_s53 → F6_t54 (revolve, cut)
    with BuildSketch(Plane.XY.offset(-6.09601)):
        with BuildLine():
            ThreePointArc((0, 1.016), (0.2975795103, 0.2975795103), (1.016, 0))
            Line((1.016, 0), (0, 0))
            Line((0, 0), (0, 1.016))
        make_face()
    revolve(axis=Axis((0, 1.26999, -6.09601), (1, 0, 0)), revolution_arc=F6_T54_ANGLE, mode=Mode.SUBTRACT)

    # F6_s55 → F6_t56 (revolve, cut)
    with BuildSketch(Plane.XZ.offset(15.2481793371)):
        with BuildLine():
            ThreePointArc((0, -1.524), (0.2975795103, -2.2424204897), (1.016, -2.54))
            Line((1.016, -2.54), (0, -2.54))
            Line((0, -2.54), (0, -1.524))
        make_face()
    revolve(axis=Axis((0, -15.2481793371, 2.5399999982), (-1, 0, 0)), revolution_arc=F6_T56_ANGLE, mode=Mode.SUBTRACT)

    # F6_s57 → F6_t58 (revolve, cut)
    with BuildSketch(Plane.XZ.offset(15.4305)):
        with BuildLine():
            ThreePointArc((0, -1.016), (0.2975795103, -0.2975795103), (1.016, 0))
            Line((1.016, 0), (0, 0))
            Line((0, 0), (0, -1.016))
        make_face()
    revolve(axis=Axis((0, -15.4305, -2.032), (1, 0, 0)), revolution_arc=F6_T58_ANGLE, mode=Mode.SUBTRACT)

    # F6_s59 → F6_t60 (revolve, cut)
    with BuildSketch(Plane.XZ.offset(5.0800000001)):
        with BuildLine():
            ThreePointArc((0, -1.016), (0.2975795103, -0.2975795103), (1.016, 0))
            Line((1.016, 0), (0, 0))
            Line((0, 0), (0, -1.016))
        make_face()
    revolve(axis=Axis((0, -5.0800000001, 5.0800000001), (1, 0, 0)), revolution_arc=F6_T60_ANGLE, mode=Mode.SUBTRACT)

    # F6_s61 → F6_t62 (revolve, cut)
    with BuildSketch(Plane.XY.offset(12.4459999999)):
        with BuildLine():
            ThreePointArc((0, 1.016), (0.2975795103, 0.2975795103), (1.016, 0))
            Line((1.016, 0), (0, 0))
            Line((0, 0), (0, 1.016))
        make_face()
    revolve(axis=Axis((0, 5.0800000001, 12.4459999999), (-1, 0, 0)), revolution_arc=F6_T62_ANGLE, mode=Mode.SUBTRACT)

    # F6_s63 → F6_t64 (revolve, cut)
    with BuildSketch(Plane(origin=(0, 5.3433037504, 1.3499285295), x_dir=(1, 0, 0), z_dir=(0, -0.9695374162, -0.244943256))):
        with BuildLine():
            ThreePointArc((0, 15.5087068112), (0.2975795103, 16.2271273009), (1.016, 16.5247068112))
            Line((1.016, 16.5247068112), (0, 16.5247068112))
            Line((0, 16.5247068112), (0, 15.5087068112))
        make_face()
    revolve(axis=Axis((0, 2.5399999999, 12.4459999999), (-1, 0, 0)), revolution_arc=F6_T64_ANGLE, mode=Mode.SUBTRACT)


with BuildPart() as f6_tool67:
    # F6_s68 → F6_t69 (new body)
    with BuildSketch(Plane.XY):
        with BuildLine():
            ThreePointArc((157.734, 0), (158.4524204897, 0.2975795103), (158.75, 1.016))
            Line((158.75, 1.016), (158.75, 0))
            Line((158.75, 0), (157.734, 0))
        make_face()
    extrude(amount=-F6_T69_DEPTH)

    split(bisect_by=Plane.XY.offset(-2.54), keep=Keep.TOP)


with BuildPart() as f6_tool71:
    # F6_s72 → F6_t73 (new body)
    with BuildSketch(Plane.XZ.offset(15.2481793367)):
        with BuildLine():
            ThreePointArc((157.734, -2.54), (158.4524204897, -2.2424204897), (158.75, -1.524))
            Line((158.75, -1.524), (158.75, -2.54))
            Line((158.75, -2.54), (157.734, -2.54))
        make_face()
    extrude(amount=-F6_T73_DEPTH)

    split(bisect_by=Plane.XZ, keep=Keep.BOTTOM)


with BuildPart() as f6_tool67_1:
    add(f6_tool67.part)

    # F6_t75: intersect F6_tool71
    add(f6_tool71.part, mode=Mode.INTERSECT)


with BuildPart() as f1_1:
    add(f1.part)

    # F6_t65: cut F6_tool67
    add(f6_tool67_1.part, mode=Mode.SUBTRACT)


with BuildPart() as f6_tool78:
    # F6_s79 → F6_t80 (new body)
    with BuildSketch(Plane.XY):
        with BuildLine():
            ThreePointArc((0, 1.016), (0.2975795103, 0.2975795103), (1.016, 0))
            Line((1.016, 0), (0, 0))
            Line((0, 0), (0, 1.016))
        make_face()
    extrude(amount=-F6_T80_DEPTH)

    split(bisect_by=Plane.XY.offset(-2.54), keep=Keep.TOP)


with BuildPart() as f6_tool82:
    # F6_s83 → F6_t84 (new body)
    with BuildSketch(Plane.XZ.offset(15.2481793367)):
        with BuildLine():
            ThreePointArc((0, -1.524), (0.2975795103, -2.2424204897), (1.016, -2.54))
            Line((1.016, -2.54), (0, -2.54))
            Line((0, -2.54), (0, -1.524))
        make_face()
    extrude(amount=-F6_T84_DEPTH)

    split(bisect_by=Plane.XZ, keep=Keep.BOTTOM)


with BuildPart() as f6_tool78_1:
    add(f6_tool78.part)

    # F6_t86: intersect F6_tool82
    add(f6_tool82.part, mode=Mode.INTERSECT)


with BuildPart() as f1_2:
    add(f1_1.part)

    # F6_t76: cut F6_tool78
    add(f6_tool78_1.part, mode=Mode.SUBTRACT)


solid = f1_2.part
